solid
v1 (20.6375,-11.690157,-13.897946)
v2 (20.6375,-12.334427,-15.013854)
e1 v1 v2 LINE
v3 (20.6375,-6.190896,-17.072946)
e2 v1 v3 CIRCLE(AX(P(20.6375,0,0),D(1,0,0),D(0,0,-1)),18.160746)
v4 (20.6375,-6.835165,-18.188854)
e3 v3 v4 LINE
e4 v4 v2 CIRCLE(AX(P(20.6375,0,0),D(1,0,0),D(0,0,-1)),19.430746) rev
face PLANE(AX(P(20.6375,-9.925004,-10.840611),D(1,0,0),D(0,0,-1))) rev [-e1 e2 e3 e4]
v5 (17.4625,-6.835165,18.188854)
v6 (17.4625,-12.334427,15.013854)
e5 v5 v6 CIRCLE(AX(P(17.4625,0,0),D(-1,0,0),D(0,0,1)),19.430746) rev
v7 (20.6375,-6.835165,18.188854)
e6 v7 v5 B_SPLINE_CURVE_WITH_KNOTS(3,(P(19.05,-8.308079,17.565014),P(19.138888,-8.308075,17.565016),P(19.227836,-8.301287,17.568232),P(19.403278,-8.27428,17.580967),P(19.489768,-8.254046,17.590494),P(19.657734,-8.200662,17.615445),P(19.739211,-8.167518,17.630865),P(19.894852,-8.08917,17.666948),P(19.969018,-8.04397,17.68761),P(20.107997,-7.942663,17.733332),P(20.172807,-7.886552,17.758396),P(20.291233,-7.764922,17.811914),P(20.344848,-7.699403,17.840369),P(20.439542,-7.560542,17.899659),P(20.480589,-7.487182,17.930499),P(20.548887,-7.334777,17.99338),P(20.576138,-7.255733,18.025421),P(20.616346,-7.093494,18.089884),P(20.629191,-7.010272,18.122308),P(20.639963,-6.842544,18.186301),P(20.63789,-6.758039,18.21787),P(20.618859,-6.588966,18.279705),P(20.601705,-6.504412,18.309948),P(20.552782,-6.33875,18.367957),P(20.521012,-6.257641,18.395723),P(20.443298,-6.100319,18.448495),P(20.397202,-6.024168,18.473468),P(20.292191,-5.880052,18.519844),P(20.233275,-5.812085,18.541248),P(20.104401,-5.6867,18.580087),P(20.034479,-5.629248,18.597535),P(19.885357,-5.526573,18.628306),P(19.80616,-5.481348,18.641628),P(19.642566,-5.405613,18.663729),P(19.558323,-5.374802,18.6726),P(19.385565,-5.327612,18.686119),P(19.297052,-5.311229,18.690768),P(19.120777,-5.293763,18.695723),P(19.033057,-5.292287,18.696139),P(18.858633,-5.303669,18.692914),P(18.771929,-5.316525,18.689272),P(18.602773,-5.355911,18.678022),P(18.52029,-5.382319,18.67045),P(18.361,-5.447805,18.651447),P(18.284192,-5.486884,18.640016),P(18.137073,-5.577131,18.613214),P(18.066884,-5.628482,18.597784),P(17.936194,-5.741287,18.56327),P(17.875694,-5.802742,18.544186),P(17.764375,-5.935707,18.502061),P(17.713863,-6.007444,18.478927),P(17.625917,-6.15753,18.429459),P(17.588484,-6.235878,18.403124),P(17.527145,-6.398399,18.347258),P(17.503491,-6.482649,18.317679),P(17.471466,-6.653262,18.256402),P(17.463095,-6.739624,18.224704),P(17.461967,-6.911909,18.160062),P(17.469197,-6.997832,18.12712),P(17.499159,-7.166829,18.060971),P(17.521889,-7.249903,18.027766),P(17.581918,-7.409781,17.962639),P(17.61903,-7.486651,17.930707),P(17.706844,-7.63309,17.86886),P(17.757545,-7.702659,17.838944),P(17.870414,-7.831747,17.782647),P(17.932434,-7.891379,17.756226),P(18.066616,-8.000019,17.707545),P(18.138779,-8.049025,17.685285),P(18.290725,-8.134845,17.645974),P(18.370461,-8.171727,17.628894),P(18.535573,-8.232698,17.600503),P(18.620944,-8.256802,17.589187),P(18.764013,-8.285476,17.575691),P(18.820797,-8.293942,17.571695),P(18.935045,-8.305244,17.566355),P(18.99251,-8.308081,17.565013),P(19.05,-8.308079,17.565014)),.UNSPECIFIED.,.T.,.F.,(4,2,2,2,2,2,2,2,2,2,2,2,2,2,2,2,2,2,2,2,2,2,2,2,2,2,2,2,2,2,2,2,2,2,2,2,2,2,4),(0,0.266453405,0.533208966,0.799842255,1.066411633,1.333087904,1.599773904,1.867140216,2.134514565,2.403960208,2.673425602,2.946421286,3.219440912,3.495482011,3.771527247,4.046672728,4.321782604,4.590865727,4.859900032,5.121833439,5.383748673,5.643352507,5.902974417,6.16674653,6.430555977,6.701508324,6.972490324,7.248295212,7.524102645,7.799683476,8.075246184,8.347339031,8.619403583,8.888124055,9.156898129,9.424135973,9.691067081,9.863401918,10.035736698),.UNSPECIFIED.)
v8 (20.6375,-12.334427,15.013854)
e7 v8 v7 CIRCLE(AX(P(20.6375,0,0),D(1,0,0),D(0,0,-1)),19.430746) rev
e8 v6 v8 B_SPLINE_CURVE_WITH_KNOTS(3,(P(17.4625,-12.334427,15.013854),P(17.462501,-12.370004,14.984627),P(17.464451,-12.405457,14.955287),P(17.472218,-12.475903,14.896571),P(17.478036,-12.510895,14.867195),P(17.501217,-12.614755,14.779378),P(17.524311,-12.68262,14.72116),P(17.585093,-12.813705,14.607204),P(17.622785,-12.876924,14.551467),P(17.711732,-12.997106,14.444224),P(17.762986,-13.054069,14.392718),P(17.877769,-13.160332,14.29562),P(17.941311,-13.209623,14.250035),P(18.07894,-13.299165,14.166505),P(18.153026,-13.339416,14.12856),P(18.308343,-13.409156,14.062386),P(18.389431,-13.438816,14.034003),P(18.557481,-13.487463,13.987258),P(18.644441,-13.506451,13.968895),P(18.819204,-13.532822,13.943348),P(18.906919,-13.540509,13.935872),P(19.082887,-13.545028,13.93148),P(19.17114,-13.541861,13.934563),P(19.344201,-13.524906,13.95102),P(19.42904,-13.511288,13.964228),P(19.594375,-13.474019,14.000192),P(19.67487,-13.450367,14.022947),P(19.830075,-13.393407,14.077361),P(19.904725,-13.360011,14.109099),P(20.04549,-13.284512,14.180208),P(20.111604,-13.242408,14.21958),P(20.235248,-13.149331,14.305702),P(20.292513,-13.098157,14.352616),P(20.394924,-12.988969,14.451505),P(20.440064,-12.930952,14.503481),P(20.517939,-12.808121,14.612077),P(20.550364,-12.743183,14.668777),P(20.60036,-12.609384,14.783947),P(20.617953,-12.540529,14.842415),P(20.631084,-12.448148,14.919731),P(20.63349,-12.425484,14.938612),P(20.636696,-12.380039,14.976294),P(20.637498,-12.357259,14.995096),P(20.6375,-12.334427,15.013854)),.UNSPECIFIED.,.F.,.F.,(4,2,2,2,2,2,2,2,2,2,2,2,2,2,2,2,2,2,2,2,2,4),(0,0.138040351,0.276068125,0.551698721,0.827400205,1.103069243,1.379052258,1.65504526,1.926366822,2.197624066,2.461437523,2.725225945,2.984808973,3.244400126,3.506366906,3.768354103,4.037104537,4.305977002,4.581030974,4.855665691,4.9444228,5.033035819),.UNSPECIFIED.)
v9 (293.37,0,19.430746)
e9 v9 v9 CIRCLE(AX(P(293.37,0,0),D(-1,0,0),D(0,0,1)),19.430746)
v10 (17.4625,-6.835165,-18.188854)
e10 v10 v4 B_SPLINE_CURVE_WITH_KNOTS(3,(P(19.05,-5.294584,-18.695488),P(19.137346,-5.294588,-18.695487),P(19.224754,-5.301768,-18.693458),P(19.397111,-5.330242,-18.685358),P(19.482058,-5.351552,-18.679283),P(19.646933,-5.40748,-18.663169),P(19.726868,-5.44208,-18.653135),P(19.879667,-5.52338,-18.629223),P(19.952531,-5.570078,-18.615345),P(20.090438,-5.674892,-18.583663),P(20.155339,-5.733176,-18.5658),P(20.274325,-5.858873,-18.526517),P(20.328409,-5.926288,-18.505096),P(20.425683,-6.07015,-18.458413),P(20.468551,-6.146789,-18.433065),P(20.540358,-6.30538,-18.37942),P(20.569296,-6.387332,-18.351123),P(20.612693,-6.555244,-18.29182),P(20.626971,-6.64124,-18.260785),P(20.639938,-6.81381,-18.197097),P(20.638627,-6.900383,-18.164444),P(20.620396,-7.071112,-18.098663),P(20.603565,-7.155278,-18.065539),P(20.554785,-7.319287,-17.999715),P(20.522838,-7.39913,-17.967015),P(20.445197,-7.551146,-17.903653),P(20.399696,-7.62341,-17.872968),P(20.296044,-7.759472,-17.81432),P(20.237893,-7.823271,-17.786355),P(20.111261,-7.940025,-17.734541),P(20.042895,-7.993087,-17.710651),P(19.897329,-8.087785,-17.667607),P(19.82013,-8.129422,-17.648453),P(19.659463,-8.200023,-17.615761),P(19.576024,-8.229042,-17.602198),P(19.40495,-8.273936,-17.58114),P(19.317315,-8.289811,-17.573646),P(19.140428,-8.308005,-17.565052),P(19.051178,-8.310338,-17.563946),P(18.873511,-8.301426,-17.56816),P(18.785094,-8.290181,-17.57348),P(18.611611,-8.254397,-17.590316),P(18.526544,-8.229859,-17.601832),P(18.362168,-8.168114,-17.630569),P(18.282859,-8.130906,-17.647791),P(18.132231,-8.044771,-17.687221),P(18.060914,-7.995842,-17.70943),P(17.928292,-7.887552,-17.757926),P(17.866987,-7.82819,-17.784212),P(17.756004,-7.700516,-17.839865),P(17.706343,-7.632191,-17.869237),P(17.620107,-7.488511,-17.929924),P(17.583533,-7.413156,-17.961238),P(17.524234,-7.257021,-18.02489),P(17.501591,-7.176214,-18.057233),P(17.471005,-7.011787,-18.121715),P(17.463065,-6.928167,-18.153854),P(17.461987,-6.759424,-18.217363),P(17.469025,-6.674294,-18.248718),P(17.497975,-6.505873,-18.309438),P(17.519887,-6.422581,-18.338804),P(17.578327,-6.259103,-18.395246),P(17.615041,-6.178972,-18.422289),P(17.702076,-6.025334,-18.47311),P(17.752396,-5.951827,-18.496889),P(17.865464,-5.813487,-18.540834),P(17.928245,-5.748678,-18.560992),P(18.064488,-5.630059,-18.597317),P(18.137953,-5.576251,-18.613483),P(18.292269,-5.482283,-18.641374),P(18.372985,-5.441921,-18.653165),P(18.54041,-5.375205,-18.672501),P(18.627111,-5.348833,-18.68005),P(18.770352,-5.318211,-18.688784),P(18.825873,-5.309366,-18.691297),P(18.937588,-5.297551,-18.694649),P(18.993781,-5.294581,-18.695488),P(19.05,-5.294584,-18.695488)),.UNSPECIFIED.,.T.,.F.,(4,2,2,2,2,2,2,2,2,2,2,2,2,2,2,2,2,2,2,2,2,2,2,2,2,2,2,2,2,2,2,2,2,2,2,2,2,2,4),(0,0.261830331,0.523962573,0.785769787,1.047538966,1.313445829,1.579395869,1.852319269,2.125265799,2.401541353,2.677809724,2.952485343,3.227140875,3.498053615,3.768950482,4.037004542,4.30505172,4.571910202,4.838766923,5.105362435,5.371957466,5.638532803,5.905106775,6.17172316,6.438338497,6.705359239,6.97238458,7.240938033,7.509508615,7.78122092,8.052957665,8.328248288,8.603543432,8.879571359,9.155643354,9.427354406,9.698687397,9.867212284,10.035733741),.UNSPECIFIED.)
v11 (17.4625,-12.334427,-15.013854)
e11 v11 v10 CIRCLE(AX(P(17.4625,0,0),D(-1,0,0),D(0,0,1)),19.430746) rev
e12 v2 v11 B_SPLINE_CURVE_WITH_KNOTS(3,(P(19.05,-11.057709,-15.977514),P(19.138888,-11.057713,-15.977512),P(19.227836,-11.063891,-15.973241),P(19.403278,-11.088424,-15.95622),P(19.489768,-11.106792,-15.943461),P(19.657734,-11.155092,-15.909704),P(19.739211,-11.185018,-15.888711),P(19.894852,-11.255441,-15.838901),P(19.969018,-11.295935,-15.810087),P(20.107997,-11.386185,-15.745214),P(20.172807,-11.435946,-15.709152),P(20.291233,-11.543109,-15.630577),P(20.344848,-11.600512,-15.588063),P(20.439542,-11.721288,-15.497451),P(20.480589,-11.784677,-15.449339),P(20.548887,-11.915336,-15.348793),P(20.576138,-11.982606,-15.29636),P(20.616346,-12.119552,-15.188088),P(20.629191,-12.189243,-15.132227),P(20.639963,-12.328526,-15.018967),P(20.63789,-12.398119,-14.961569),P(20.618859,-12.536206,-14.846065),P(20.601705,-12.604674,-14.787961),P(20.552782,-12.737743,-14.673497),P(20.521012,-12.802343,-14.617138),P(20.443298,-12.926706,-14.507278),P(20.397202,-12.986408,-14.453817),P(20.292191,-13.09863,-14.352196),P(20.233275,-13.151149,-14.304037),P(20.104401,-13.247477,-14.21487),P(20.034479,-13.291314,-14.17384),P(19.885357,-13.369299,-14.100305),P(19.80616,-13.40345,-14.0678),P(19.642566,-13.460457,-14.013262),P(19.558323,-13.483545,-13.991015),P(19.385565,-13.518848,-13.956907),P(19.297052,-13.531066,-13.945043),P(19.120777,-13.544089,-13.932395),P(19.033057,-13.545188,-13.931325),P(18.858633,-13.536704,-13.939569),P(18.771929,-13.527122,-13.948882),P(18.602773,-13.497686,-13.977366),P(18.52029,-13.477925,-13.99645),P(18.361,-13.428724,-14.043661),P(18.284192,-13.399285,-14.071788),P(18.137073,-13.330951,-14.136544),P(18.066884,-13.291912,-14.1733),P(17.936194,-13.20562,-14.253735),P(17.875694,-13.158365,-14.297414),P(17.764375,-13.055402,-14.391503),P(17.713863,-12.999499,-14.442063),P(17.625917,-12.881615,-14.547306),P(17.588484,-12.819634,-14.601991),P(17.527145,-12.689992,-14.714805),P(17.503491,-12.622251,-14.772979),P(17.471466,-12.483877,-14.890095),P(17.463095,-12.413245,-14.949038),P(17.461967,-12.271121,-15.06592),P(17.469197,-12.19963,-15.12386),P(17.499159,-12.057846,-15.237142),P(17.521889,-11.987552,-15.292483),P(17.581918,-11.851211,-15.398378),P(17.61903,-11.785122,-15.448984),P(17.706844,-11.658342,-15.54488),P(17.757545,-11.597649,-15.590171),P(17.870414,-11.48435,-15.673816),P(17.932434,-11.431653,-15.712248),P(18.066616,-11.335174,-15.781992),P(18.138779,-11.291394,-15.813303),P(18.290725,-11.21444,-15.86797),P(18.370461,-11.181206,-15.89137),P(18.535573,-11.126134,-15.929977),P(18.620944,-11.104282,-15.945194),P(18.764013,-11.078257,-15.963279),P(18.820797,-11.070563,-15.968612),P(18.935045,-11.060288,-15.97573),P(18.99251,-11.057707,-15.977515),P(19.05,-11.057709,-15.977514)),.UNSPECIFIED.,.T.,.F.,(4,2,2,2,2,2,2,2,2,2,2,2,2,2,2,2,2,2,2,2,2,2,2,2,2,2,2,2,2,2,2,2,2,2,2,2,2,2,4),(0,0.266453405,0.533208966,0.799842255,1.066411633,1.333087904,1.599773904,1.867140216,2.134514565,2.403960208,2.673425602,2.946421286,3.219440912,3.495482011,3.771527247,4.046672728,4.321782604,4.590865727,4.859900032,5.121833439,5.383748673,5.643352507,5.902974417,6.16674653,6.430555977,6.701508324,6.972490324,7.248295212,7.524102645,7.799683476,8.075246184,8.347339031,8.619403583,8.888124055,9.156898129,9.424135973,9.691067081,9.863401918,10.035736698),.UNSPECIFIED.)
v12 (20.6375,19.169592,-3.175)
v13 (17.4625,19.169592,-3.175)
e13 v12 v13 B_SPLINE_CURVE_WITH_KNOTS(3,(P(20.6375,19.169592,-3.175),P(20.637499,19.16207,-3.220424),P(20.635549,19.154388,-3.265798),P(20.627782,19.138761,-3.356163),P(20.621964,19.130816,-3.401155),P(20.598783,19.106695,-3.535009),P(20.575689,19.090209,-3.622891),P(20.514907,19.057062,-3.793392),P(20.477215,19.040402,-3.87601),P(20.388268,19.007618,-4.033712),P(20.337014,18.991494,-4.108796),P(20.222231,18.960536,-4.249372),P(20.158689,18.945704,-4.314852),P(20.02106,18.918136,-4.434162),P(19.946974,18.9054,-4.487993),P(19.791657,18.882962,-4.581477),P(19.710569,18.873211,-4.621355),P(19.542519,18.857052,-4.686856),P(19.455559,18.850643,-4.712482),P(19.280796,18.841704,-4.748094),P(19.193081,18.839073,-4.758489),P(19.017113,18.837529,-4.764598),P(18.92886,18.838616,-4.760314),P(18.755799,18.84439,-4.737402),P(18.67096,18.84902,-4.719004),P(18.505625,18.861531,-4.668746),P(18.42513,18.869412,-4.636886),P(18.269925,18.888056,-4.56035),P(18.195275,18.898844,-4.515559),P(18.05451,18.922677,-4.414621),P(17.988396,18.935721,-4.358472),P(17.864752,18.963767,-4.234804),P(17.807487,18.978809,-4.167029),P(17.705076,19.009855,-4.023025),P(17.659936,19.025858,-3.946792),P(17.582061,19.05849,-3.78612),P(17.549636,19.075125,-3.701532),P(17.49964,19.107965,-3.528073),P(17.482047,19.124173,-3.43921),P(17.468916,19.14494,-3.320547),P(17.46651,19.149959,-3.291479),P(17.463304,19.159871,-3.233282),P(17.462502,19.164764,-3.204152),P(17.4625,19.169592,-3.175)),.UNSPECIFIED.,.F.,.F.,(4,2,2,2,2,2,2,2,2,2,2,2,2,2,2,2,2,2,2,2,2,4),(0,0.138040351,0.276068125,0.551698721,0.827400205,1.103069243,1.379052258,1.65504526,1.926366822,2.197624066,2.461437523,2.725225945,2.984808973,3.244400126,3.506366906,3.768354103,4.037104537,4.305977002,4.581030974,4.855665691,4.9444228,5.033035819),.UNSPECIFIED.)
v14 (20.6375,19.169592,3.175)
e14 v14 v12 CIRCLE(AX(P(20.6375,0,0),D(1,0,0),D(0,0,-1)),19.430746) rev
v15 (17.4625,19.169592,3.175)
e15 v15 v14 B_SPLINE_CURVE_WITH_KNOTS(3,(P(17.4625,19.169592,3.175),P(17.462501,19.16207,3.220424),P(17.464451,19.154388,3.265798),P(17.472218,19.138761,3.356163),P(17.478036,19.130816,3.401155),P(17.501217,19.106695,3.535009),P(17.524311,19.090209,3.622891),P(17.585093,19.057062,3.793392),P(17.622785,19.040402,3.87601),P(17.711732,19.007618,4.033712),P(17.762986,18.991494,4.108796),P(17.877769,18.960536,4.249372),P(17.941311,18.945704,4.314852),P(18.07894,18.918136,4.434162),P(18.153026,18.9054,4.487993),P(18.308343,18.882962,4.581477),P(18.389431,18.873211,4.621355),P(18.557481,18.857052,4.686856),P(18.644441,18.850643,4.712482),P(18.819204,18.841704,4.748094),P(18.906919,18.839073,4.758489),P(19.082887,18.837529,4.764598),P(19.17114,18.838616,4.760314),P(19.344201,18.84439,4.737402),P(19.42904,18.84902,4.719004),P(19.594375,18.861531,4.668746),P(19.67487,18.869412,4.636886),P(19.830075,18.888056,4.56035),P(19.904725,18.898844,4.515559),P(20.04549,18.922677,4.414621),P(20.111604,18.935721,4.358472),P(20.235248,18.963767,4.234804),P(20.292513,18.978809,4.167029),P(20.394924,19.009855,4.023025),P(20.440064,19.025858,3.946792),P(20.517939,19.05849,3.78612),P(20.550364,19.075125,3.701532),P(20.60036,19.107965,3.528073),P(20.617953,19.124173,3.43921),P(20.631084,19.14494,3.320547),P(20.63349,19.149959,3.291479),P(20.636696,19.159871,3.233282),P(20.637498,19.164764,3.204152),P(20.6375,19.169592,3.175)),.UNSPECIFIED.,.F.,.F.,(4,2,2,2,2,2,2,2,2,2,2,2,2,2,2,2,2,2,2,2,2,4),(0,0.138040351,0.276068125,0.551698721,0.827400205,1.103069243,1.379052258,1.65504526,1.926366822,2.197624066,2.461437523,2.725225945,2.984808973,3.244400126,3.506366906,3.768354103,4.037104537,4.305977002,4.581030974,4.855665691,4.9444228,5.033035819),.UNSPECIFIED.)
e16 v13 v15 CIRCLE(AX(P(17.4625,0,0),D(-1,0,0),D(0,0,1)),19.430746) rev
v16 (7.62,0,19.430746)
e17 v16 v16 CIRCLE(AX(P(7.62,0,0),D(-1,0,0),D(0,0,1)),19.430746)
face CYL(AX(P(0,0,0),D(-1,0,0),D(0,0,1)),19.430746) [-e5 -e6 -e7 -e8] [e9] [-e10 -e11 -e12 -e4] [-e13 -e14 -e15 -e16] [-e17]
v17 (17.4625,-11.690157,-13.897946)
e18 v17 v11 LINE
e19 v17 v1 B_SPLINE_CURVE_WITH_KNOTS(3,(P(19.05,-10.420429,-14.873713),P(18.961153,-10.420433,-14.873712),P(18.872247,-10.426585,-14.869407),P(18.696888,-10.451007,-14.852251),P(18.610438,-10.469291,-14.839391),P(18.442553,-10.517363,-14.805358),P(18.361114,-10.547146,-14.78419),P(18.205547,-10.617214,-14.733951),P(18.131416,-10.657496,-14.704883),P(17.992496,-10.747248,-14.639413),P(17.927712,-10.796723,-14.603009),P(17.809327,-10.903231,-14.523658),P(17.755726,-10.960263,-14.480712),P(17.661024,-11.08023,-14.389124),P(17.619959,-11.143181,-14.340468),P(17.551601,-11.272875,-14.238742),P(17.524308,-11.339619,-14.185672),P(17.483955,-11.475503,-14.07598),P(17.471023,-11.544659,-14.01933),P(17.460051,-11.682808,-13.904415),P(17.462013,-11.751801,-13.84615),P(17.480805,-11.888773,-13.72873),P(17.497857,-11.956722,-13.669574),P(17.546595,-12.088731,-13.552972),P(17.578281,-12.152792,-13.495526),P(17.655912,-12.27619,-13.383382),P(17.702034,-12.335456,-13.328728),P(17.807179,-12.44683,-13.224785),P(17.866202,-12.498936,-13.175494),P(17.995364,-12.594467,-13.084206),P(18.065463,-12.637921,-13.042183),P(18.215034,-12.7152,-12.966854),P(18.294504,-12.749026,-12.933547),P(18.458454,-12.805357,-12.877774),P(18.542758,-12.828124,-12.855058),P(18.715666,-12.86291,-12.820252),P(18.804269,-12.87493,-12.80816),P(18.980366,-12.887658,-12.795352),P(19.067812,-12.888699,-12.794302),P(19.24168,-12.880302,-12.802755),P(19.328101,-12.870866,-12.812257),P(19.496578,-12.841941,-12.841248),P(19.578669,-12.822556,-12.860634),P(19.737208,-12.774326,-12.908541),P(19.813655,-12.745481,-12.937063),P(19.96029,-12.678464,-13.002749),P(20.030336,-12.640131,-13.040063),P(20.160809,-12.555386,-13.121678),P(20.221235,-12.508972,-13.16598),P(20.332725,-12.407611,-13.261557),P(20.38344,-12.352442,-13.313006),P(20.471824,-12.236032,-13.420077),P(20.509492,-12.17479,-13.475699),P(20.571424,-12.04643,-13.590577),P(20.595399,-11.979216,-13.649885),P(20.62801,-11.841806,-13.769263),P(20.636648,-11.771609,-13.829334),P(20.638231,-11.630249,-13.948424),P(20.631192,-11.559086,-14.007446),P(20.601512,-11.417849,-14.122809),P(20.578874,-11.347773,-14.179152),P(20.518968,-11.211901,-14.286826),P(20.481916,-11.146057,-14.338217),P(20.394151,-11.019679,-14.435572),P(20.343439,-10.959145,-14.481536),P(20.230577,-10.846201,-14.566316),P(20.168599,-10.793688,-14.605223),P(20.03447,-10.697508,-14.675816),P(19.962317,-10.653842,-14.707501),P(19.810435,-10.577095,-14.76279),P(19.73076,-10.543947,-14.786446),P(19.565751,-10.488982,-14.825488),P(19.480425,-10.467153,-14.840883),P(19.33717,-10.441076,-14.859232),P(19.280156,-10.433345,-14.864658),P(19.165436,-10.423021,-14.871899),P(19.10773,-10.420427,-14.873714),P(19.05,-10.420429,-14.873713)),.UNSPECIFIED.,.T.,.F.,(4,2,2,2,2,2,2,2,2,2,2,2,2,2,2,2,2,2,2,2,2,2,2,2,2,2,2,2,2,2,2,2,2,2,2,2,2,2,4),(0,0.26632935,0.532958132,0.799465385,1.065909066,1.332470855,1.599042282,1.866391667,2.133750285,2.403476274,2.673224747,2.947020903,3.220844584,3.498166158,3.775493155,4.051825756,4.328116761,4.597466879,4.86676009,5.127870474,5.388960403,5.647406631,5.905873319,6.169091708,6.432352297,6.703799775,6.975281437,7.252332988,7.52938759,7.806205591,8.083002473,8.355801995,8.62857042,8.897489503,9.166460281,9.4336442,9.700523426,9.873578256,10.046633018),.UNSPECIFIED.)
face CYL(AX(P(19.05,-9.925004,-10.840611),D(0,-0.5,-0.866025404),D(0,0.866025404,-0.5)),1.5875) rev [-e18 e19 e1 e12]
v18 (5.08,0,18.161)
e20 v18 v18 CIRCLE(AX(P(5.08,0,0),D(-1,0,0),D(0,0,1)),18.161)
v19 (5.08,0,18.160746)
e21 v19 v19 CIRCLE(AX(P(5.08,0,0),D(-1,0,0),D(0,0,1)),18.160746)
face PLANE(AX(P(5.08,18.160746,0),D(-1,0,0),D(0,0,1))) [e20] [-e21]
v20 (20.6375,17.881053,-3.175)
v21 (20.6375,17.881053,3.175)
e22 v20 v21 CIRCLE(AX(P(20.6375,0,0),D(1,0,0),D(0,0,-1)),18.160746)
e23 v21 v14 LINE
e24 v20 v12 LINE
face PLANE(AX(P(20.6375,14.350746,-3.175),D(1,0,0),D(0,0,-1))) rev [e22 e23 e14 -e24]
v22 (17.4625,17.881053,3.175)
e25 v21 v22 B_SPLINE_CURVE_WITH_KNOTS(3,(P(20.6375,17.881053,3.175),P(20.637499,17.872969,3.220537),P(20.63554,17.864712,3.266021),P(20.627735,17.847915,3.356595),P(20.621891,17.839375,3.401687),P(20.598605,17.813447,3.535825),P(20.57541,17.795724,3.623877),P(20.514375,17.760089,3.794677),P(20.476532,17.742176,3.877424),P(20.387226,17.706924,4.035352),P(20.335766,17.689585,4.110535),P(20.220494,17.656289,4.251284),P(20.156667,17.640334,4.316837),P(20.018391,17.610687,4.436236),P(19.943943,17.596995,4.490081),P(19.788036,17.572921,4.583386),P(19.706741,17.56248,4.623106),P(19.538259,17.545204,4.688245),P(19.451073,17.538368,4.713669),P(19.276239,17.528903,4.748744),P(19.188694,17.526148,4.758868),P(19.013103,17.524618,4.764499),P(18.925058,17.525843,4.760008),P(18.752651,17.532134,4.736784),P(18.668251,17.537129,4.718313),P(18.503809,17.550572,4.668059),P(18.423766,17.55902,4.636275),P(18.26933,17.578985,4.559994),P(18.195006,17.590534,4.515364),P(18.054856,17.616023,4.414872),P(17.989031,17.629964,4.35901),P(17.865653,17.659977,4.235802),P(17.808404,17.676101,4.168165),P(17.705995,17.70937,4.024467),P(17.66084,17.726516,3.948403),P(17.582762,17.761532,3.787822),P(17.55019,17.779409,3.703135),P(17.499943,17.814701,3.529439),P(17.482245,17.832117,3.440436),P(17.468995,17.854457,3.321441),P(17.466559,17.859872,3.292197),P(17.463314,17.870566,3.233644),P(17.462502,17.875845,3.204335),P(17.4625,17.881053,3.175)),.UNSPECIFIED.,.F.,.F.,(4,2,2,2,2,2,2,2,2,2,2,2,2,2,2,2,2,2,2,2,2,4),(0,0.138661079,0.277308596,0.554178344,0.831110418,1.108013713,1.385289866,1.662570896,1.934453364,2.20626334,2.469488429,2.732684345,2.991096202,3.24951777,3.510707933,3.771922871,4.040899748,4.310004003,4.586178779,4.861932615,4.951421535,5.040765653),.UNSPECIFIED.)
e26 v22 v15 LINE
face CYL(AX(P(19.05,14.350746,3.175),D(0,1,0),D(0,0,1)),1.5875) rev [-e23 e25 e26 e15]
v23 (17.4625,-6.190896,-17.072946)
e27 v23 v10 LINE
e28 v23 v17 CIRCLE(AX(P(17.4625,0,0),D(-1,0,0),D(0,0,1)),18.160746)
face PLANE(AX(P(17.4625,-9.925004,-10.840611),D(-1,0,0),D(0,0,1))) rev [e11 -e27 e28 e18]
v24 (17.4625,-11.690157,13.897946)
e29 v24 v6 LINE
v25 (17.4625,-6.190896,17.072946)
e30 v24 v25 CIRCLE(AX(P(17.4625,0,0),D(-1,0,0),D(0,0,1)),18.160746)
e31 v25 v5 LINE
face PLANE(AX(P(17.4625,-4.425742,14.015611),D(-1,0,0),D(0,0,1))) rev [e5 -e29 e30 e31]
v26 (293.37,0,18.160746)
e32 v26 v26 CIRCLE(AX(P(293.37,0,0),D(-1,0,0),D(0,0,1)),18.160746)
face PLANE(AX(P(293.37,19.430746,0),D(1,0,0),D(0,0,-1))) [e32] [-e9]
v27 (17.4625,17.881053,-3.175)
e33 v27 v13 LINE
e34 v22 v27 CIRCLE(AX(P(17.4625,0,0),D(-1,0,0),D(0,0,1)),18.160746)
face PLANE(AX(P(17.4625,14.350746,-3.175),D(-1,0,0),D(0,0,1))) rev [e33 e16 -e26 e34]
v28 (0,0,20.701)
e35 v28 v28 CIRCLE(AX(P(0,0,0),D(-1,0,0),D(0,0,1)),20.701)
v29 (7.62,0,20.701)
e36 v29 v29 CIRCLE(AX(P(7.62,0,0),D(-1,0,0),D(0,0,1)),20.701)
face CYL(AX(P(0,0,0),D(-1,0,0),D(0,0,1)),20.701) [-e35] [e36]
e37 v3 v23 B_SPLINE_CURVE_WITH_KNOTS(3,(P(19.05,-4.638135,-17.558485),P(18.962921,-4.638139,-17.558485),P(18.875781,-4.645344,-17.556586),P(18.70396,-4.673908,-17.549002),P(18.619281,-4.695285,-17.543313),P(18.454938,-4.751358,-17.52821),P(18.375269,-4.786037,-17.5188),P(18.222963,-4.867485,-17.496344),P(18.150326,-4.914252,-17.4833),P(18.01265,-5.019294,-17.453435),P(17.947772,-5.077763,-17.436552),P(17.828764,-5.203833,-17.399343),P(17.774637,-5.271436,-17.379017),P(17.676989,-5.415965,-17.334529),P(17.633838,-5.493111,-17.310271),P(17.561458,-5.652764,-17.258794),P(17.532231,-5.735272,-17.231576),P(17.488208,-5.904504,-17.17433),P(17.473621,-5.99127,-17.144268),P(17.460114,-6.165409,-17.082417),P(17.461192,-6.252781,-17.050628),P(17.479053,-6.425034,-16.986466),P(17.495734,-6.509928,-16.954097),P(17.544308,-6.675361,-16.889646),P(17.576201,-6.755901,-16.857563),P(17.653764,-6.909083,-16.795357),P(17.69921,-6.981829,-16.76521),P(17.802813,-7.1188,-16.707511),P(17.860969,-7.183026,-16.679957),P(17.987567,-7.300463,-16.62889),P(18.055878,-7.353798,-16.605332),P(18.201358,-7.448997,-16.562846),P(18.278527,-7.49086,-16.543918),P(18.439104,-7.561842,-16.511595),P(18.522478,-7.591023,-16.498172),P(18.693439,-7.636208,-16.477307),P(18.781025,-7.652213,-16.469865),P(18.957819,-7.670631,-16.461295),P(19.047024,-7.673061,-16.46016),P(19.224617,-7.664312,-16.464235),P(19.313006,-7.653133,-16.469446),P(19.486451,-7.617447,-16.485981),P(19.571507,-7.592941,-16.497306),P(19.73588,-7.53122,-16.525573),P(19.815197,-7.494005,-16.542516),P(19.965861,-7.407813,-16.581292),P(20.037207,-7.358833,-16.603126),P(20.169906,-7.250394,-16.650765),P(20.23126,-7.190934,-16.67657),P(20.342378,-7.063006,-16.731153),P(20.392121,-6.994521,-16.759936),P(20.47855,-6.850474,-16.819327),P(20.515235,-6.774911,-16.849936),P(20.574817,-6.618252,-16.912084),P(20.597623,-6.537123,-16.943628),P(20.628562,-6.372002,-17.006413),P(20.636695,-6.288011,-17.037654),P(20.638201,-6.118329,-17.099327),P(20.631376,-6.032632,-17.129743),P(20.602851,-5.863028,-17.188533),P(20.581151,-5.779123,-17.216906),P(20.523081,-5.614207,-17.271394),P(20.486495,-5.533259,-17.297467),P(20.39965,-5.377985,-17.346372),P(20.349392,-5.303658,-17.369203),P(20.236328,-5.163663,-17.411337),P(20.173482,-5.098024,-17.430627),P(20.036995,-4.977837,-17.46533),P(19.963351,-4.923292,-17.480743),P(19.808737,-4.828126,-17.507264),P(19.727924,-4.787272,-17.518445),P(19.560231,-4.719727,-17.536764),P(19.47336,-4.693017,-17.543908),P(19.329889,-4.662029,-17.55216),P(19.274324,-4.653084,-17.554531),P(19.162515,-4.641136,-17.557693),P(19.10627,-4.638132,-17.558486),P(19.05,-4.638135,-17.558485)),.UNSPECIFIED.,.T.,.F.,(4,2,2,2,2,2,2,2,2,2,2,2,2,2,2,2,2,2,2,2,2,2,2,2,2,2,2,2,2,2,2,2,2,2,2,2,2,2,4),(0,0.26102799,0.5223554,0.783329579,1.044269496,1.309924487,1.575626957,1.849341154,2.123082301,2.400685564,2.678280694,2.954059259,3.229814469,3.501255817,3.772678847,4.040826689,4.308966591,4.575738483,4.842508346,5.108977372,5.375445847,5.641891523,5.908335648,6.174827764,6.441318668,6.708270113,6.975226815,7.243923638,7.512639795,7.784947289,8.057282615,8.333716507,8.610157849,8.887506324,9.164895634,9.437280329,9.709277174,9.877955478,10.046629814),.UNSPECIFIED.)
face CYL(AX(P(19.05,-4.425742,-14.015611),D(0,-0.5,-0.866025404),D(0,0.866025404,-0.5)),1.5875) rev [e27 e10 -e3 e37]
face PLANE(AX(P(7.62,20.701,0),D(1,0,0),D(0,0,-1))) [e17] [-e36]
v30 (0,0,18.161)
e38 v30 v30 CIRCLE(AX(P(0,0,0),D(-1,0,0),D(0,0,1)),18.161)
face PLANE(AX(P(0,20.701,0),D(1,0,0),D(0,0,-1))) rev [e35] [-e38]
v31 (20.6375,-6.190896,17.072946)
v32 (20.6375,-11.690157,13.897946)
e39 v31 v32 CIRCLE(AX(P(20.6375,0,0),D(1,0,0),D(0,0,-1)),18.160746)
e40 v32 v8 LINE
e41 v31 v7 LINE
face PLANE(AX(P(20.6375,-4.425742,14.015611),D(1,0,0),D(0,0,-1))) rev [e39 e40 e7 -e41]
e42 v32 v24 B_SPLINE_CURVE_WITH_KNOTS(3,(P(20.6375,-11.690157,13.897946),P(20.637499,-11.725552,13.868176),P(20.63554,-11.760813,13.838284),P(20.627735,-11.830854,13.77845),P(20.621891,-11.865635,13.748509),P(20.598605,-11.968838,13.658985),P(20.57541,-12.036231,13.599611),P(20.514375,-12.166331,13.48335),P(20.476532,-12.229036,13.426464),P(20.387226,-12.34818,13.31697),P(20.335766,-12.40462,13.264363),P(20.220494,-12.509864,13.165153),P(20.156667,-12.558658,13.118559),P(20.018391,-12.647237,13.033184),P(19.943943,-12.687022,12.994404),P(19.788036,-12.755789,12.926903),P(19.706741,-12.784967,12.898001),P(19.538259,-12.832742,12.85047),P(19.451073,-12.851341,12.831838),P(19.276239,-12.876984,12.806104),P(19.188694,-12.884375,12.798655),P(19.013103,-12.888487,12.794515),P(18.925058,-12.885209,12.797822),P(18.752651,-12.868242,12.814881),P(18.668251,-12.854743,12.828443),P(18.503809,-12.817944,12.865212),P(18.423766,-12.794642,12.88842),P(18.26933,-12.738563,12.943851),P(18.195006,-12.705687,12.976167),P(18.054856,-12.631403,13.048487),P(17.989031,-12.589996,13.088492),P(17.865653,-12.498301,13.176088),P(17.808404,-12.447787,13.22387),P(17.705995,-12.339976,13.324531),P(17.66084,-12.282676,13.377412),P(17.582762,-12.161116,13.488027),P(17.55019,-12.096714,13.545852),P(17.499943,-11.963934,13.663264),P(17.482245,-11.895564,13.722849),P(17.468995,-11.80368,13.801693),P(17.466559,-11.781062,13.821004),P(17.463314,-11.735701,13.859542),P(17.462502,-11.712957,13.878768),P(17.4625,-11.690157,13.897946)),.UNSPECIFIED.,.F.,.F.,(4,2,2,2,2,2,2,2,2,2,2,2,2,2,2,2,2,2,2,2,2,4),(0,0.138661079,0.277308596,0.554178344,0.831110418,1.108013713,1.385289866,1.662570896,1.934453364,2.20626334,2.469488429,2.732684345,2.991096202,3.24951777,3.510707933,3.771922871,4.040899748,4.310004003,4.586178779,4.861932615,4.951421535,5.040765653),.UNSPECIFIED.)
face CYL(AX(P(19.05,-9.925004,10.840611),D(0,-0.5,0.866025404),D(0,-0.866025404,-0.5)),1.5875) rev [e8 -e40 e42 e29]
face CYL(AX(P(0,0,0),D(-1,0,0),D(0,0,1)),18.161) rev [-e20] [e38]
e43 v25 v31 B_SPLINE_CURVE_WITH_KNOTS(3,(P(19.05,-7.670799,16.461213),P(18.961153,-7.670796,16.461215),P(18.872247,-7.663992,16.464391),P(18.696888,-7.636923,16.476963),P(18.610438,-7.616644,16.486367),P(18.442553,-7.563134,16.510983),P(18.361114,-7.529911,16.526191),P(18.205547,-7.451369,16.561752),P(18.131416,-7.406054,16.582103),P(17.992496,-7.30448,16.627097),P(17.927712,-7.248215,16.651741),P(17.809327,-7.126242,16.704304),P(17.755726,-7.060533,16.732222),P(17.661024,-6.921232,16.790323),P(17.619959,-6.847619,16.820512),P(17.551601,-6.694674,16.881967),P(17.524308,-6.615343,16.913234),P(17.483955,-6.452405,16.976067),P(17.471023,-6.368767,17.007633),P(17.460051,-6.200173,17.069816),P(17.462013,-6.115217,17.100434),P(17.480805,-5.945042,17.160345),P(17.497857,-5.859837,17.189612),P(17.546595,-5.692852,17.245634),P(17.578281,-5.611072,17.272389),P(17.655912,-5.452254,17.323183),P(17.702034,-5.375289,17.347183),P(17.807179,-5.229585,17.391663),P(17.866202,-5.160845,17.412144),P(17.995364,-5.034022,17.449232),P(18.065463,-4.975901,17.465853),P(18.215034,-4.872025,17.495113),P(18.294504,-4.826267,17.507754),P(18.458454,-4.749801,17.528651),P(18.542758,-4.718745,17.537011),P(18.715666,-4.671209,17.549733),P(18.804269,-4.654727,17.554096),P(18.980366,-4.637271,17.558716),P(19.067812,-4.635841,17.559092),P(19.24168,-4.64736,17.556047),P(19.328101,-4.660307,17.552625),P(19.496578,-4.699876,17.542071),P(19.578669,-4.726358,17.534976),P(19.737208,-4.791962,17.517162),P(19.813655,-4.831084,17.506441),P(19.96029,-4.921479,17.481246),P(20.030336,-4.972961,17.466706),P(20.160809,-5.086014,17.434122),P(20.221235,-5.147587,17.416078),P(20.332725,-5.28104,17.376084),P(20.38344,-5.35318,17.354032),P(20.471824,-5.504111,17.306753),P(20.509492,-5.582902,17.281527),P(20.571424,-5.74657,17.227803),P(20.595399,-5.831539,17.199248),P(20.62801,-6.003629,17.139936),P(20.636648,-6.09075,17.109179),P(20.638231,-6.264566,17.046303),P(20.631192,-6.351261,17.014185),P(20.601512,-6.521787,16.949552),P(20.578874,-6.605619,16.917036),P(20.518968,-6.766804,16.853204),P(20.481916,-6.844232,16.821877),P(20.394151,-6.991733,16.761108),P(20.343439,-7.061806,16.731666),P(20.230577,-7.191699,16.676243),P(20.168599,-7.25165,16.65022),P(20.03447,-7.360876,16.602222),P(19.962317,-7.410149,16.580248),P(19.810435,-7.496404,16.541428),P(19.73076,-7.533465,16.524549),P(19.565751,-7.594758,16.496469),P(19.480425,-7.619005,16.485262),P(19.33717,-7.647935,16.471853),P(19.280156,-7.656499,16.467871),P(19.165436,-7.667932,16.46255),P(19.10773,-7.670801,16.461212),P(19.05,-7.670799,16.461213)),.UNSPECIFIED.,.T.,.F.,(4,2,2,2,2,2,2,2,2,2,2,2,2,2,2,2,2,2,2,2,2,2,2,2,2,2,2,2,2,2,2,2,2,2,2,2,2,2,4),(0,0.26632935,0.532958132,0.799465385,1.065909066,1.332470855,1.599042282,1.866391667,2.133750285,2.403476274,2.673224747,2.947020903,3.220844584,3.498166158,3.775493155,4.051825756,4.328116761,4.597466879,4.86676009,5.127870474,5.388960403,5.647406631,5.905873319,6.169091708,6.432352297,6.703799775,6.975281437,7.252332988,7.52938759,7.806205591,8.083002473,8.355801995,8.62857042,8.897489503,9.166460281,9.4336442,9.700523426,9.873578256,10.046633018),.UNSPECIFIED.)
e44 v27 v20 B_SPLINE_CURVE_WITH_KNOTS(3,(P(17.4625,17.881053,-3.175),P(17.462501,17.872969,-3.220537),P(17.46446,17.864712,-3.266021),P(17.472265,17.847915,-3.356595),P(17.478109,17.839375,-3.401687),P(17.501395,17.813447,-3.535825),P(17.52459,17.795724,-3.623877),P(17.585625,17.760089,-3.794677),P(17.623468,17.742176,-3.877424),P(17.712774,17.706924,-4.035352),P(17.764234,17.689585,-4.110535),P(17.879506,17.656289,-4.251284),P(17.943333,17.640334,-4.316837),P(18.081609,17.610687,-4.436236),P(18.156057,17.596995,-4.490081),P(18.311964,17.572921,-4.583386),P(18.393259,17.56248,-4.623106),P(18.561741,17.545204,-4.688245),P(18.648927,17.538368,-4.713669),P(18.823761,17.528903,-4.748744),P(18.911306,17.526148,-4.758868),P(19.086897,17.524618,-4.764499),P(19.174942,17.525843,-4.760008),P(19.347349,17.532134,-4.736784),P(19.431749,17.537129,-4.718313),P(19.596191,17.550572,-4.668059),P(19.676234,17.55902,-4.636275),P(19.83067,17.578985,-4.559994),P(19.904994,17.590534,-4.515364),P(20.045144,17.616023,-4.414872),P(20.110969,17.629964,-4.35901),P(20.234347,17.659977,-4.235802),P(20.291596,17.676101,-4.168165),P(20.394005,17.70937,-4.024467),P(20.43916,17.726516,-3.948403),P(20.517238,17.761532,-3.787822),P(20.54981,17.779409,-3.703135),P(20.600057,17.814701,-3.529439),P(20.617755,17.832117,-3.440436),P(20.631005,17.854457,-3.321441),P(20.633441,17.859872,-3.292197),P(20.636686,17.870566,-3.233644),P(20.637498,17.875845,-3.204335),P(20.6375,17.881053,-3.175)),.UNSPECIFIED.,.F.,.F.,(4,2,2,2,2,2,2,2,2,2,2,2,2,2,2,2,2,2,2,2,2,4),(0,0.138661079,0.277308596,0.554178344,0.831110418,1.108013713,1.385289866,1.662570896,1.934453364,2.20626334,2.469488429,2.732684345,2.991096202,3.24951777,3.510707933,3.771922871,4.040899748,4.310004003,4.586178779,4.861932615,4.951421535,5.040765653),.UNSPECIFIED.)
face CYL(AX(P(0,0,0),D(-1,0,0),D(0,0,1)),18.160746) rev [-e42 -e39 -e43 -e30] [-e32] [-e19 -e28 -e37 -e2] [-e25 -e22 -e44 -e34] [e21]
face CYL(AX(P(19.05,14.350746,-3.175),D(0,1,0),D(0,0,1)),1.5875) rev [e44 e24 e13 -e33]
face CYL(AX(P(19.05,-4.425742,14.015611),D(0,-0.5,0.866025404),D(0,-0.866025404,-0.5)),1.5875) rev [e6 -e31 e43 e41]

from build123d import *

# Parameters (mm, degrees)
CUT_EXTRUDE1_DEPTH = 5.08
CIRPATTERN1_COUNT  = 3


# Read off the part's stored shape, not the designer's step: Revolve1
with BuildPart() as part:
    # Revolve1 outline → Revolve1 (revolve)
    with BuildSketch(Plane.YX):
        Polygon((20.701, 7.62), (19.430746, 7.62), (19.430746, 293.37), (18.160746, 293.37), (18.160746, 5.08), (18.161, 5.08), (18.161, 0), (20.701, 0), align=None)
    revolve(axis=Axis((0, 0, 0), (1, 0, 0)))

    # Sketch2 → Cut-Extrude1 (cut)
    with BuildSketch(Plane(origin=(0, 19.430746, 0), x_dir=(1, 0, 0), z_dir=(0, 1, 0))):
        with BuildLine():
            Line((20.6375, 3.175), (20.6375, -3.175))
            ThreePointArc((20.6375, -3.175), (19.05, -4.7625), (17.4625, -3.175))
            Line((17.4625, -3.175), (17.4625, 3.175))
            ThreePointArc((17.4625, 3.175), (19.05, 4.7625), (20.6375, 3.175))
        make_face()
    cut_extrude1 = extrude(amount=-CUT_EXTRUDE1_DEPTH, mode=Mode.SUBTRACT)

    # CirPattern1: Cut-Extrude1 ×3 about axis
    cirpattern1_axis = Axis((0, 0, 0), (-1, 0, 0))
    for i in range(1, CIRPATTERN1_COUNT):
        add(cut_extrude1.rotate(cirpattern1_axis, i * 360 / CIRPATTERN1_COUNT), mode=Mode.SUBTRACT)


solid = part.part
